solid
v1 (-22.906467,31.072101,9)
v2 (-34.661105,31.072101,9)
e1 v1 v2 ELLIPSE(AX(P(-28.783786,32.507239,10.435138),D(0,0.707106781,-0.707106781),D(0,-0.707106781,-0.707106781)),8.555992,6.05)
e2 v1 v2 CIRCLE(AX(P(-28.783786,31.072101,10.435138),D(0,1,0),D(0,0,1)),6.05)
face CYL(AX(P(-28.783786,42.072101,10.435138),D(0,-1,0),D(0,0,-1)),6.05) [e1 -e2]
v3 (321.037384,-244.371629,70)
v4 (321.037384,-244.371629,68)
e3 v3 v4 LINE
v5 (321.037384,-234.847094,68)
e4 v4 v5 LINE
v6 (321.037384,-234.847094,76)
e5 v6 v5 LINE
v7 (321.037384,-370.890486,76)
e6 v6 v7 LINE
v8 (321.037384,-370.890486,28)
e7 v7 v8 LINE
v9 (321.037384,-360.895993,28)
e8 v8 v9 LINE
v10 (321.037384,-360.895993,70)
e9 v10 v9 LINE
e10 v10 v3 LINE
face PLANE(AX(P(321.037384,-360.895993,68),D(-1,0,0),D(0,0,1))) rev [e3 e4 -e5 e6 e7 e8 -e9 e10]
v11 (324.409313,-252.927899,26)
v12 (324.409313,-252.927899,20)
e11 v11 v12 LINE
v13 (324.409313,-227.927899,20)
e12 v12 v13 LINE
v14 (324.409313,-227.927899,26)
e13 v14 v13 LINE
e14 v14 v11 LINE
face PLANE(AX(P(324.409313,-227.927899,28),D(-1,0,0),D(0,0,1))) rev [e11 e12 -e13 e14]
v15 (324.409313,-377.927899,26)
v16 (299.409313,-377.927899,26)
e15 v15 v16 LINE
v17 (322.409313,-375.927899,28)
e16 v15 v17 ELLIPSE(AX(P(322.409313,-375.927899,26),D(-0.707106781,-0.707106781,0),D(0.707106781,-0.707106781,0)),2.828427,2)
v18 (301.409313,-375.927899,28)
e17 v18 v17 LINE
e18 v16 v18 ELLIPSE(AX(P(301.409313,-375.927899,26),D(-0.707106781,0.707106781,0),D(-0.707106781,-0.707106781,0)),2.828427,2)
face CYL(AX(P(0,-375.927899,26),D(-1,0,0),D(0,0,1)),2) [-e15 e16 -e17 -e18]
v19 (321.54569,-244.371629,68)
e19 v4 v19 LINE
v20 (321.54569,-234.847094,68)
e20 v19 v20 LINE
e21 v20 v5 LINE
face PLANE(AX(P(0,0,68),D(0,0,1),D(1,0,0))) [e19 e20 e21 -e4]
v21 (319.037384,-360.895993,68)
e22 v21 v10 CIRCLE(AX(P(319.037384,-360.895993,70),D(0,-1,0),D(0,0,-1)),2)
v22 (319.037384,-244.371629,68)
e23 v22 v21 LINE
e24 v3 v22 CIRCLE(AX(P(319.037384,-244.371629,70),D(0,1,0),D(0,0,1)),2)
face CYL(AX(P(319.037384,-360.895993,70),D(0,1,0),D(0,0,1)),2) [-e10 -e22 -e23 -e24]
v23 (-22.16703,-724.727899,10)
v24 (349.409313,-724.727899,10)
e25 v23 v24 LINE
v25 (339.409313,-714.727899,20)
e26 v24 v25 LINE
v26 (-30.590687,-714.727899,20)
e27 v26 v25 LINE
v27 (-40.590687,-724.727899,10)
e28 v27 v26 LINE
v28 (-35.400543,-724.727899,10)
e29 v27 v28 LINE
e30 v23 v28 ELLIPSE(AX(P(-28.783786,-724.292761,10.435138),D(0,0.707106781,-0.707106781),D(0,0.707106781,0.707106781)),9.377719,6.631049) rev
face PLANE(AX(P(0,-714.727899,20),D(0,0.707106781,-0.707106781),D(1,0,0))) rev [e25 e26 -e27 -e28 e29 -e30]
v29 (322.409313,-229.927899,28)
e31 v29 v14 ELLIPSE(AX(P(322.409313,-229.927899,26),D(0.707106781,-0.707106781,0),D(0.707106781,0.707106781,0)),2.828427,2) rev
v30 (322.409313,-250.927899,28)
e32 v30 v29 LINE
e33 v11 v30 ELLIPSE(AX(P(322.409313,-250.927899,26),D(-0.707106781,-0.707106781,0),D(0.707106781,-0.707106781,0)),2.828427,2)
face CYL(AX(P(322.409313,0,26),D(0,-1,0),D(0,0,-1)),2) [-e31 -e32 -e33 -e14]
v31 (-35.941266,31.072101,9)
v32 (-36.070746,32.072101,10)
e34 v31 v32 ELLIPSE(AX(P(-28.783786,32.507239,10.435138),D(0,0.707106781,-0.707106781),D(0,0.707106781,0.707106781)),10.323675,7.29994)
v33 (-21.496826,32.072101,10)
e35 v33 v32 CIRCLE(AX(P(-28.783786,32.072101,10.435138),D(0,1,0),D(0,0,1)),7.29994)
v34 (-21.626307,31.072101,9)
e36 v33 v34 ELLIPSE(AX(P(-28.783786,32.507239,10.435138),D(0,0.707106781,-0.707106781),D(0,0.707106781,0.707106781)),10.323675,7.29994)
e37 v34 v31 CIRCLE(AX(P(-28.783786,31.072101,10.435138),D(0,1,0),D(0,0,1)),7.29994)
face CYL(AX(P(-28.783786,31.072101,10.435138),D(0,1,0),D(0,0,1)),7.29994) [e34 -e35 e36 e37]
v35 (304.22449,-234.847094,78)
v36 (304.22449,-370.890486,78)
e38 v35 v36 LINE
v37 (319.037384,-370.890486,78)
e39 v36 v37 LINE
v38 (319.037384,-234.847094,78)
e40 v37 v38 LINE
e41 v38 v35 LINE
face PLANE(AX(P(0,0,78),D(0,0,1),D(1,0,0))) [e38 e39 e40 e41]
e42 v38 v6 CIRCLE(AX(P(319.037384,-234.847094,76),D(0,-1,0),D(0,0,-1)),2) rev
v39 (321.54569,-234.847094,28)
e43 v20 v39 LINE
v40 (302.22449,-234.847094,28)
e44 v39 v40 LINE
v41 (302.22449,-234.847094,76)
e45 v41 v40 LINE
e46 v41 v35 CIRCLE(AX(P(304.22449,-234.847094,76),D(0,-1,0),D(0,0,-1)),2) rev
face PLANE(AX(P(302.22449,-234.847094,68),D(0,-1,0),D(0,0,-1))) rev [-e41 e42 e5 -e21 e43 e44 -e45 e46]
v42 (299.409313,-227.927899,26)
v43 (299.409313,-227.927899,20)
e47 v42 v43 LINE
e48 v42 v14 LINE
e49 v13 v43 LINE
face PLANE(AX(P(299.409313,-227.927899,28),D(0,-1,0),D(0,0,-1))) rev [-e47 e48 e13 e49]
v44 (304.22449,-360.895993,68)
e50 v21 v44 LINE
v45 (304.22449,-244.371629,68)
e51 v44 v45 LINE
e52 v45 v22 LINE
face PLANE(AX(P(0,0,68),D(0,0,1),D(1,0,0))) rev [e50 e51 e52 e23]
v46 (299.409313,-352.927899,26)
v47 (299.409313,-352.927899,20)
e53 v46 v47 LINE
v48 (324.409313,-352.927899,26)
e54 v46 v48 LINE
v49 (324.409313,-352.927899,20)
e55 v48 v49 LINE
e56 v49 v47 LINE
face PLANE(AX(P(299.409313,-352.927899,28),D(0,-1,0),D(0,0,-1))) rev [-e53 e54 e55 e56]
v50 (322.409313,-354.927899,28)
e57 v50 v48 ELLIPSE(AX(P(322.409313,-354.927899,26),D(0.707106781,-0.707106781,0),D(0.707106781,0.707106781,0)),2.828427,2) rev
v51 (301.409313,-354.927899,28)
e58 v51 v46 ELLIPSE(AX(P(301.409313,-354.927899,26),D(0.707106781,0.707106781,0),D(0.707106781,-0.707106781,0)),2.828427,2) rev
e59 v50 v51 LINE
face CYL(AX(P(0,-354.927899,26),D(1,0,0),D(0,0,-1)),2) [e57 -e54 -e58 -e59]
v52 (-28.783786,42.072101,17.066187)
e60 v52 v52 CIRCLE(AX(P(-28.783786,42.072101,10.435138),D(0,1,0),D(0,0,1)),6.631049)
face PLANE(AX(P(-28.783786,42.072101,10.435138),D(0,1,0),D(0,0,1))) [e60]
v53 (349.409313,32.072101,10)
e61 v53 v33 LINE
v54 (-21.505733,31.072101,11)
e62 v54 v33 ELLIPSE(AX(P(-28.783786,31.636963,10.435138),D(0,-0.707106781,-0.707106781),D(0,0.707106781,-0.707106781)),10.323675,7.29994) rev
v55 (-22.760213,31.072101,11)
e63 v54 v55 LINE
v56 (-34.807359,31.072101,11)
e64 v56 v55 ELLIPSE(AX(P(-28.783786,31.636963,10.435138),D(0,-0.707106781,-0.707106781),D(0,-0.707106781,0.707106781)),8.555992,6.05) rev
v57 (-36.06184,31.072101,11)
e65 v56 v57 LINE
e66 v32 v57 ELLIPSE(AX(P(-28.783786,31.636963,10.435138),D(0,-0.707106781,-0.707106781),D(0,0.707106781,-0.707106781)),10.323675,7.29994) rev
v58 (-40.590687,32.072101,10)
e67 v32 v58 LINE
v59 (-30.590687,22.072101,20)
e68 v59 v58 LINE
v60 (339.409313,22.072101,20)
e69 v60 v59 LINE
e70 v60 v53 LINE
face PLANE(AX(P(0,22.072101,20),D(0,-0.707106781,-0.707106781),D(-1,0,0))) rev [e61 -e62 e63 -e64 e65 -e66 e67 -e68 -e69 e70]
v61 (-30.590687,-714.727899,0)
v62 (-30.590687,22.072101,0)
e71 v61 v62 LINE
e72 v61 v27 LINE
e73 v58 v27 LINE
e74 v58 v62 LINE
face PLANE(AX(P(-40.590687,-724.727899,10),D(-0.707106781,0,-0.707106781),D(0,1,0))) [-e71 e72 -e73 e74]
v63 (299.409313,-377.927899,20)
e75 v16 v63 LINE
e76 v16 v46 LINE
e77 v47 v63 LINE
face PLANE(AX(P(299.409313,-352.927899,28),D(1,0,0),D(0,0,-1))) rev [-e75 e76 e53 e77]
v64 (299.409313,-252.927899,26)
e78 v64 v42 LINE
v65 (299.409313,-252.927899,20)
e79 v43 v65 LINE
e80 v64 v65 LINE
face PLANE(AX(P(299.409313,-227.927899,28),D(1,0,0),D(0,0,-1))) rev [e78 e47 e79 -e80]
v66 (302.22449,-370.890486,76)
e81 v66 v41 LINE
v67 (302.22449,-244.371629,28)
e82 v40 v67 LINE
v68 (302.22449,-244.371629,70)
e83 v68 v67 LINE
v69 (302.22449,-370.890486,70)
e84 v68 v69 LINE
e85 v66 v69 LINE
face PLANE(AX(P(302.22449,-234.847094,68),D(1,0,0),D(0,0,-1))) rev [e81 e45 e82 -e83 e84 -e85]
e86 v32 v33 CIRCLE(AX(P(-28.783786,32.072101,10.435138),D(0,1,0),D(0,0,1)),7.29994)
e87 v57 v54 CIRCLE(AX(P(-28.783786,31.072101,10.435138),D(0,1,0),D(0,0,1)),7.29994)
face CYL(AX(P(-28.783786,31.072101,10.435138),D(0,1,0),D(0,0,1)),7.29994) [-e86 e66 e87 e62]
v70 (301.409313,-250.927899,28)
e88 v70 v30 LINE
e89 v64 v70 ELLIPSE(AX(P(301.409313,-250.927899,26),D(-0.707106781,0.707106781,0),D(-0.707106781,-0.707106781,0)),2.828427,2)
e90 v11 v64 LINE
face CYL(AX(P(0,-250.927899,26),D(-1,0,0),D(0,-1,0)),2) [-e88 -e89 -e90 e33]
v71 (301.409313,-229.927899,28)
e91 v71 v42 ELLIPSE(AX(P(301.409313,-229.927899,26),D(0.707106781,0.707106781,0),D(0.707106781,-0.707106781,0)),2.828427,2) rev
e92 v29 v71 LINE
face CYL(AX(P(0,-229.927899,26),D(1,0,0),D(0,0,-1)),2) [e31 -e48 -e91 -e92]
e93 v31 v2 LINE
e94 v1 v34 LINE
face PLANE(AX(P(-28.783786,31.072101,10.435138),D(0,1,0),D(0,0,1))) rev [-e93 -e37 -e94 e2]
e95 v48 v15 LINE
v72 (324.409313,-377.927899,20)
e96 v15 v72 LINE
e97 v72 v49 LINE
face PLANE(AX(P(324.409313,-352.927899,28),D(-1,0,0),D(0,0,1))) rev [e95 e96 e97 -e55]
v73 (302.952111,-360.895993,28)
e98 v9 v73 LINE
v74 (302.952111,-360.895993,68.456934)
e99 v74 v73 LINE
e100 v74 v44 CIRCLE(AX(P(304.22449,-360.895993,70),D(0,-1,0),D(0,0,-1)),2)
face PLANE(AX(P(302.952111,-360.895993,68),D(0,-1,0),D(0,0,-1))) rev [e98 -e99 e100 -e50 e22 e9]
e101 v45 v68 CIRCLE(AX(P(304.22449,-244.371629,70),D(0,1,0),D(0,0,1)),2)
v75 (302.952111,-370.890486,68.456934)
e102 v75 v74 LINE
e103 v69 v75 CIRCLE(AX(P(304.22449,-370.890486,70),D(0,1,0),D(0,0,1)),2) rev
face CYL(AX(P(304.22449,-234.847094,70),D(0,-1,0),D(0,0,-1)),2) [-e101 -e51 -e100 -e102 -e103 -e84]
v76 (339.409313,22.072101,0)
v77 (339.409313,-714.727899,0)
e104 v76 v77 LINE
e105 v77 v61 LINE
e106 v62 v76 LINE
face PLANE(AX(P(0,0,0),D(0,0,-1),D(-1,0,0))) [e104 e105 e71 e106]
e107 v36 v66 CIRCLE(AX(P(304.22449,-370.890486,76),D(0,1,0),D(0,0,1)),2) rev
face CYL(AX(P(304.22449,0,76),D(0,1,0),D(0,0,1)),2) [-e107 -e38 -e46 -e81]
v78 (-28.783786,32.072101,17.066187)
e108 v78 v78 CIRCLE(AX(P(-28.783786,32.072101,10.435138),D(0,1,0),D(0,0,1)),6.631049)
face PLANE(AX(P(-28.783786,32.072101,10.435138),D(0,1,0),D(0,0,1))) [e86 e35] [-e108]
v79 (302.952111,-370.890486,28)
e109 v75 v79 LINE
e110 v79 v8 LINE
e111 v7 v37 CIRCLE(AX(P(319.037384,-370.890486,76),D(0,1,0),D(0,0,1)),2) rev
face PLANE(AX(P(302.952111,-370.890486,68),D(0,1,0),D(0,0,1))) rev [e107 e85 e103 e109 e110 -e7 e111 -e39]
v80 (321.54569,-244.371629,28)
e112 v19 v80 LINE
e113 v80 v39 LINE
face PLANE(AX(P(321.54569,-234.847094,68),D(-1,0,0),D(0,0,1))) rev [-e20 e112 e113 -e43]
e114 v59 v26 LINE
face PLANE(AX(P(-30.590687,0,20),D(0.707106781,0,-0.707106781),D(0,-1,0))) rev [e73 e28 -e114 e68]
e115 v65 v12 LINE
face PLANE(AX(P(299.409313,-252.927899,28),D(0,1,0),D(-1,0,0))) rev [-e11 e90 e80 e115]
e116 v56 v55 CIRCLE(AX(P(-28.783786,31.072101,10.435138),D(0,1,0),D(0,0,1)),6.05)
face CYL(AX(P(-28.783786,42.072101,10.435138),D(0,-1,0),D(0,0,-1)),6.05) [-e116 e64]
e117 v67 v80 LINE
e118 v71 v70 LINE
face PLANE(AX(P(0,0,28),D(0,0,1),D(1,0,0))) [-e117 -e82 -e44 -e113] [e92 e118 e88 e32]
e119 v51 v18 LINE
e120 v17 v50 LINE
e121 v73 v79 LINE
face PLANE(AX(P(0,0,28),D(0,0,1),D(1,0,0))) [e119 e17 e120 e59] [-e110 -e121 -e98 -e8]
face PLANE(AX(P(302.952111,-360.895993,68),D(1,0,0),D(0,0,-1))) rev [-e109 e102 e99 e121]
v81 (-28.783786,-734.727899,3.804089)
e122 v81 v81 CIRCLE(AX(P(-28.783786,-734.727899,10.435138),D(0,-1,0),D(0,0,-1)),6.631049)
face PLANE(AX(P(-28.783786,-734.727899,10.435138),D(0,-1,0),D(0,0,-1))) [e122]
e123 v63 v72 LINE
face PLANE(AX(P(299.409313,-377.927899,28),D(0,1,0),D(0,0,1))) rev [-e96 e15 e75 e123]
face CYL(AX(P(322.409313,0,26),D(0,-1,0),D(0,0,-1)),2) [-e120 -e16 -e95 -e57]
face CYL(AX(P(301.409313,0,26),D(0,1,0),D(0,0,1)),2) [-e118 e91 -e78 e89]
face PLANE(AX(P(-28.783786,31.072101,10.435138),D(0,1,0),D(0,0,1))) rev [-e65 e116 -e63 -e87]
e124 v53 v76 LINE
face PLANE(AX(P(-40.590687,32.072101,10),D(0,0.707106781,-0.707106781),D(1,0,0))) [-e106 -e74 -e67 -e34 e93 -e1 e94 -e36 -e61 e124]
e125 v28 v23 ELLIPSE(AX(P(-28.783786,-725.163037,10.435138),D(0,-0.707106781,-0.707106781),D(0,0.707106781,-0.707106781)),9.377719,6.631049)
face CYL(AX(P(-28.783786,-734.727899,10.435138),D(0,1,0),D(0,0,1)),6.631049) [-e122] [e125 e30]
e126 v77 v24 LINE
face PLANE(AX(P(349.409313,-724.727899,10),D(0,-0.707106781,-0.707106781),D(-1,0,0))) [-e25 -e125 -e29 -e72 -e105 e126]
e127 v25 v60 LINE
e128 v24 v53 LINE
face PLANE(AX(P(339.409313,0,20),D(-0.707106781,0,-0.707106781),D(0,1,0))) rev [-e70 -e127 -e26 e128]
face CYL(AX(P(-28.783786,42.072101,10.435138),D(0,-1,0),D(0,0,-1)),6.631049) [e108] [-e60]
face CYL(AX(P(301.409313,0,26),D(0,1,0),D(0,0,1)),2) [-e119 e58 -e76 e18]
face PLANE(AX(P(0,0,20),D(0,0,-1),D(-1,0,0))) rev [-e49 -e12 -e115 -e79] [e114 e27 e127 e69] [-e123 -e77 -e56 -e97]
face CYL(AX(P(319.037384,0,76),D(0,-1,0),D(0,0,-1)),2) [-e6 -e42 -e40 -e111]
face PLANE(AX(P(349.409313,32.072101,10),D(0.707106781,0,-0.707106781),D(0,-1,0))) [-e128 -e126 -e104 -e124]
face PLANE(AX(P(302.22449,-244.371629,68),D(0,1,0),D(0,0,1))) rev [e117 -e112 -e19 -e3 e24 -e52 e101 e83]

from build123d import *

# Parameters (mm, degrees)
SKETCH1_W            = 390
SKETCH1_H            = 756.8
BOSS_EXTRUDE1_DEPTH  = 20
SKETCH2_R            = 6.05
BOSS_EXTRUDE2_DEPTH  = 10
SKETCH3_R            = 6.631048811
BOSS_EXTRUDE3_DEPTH  = 10
CHAMFER1_SIZE        = 10
BOSS_EXTRUDE5_DEPTH  = 50
SKETCH5_W            = 30
SKETCH5_H            = 160
CUT_EXTRUDE1_DEPTH   = 50
CHAMFER2_SIZE        = 10
CUT_EXTRUDE2_DEPTH   = 121
SKETCH10_W           = 25
SKETCH10_H           = 25
BOSS_EXTRUDE7_DEPTH  = 8
SKETCH15_W           = 19.321199796
SKETCH15_H           = 9.52453511
BOSS_EXTRUDE8_DEPTH  = 40
SKETCH16_W           = 18.085272723
SKETCH16_H           = 9.99449282
BOSS_EXTRUDE9_DEPTH  = 40
SKETCH18_W           = 18.812893718
SKETCH18_H           = 136.043392328
BOSS_EXTRUDE10_DEPTH = 10
FILLET1_R            = 2
FILLET2_R            = 2
FILLET3_R            = 2
CUT_EXTRUDE3_START   = -10
SKETCH23_R           = 6.05
CUT_EXTRUDE3_DEPTH   = 10
SKETCH24_R           = 7.299940413
BOSS_EXTRUDE11_DEPTH = 1
BOSS_EXTRUDE12_START = 10
SKETCH27_R           = 6.63104881
BOSS_EXTRUDE12_DEPTH = 10


with BuildPart() as part:
    # Sketch1 → Boss-Extrude1 (new body)
    with BuildSketch(Plane.XY):
        with Locations((154.409313495, -346.327898551)):
            Rectangle(SKETCH1_W, SKETCH1_H)
    extrude(amount=BOSS_EXTRUDE1_DEPTH)

    # Sketch2 → Boss-Extrude2 (add)
    with BuildSketch(Plane(origin=(0, 32.072101449, 0), x_dir=(1, 0, 0), z_dir=(0, 1, 0))):
        with Locations(Location((-28.78378628, -10.435138004, 0), (0, 0, 90))):
            Circle(SKETCH2_R)
    extrude(amount=BOSS_EXTRUDE2_DEPTH)

    # Sketch3 → Boss-Extrude3 (add)
    with BuildSketch(Plane.XZ.offset(724.727898551)):
        with Locations(Location((-28.78378628, 10.435138004, 0), (0, 0, 90))):
            Circle(SKETCH3_R)
    extrude(amount=BOSS_EXTRUDE3_DEPTH)

    # Chamfer1
    # the kernel refuses this chamfer: 10 mm, written as the material it takes off along each edge
    with BuildSketch(Plane(origin=(-40.590686505, -750.44472843, 20), x_dir=(-0.027495876610586317, 0, -0.9996219169112968), z_dir=(0, 1, 0)), Plane(origin=(349.409313495, 57.788931329, 0), x_dir=(-0.9996219169112968, 0, -0.027495876610586334), z_dir=(0, -1, 0))) as chamfer1_piece_1:
        Polygon((CHAMFER1_SIZE * 0.999621916911, -CHAMFER1_SIZE * 0.0274958766106), (-CHAMFER1_SIZE * 0.0274958766106, -CHAMFER1_SIZE * 0.999621916911), (0, 0), align=None)
    extrude(amount=808.233659759, mode=Mode.SUBTRACT)
    with BuildSketch(Plane(origin=(375.126143374, -724.727898551, 20), x_dir=(0, 0.9996219169112968, 0.02749587661058643), z_dir=(-1, 0, 0))) as chamfer1_piece_2_section:
        Polygon((CHAMFER1_SIZE * 0.999621916911, CHAMFER1_SIZE * 0.0274958766106), (-CHAMFER1_SIZE * 0.0274958766106, CHAMFER1_SIZE * 0.999621916911), (0, 0), align=None)
    chamfer1_piece_2 = extrude(amount=441.433659759, mode=Mode.PRIVATE)
    chamfer1_piece_2 = chamfer1_piece_2 - Plane(origin=(-28.78378628, -721.415314621, 10.435138004), x_dir=(0, 0, 1), z_dir=(0, 1, 0)) * Cylinder(6.631048811, 923, mode=Mode.PRIVATE)
    add(chamfer1_piece_2, mode=Mode.SUBTRACT)
    with BuildSketch(Plane(origin=(349.409313495, 57.788931329, 20), x_dir=(-0.9996219169112968, 0, 0.027495876610586282), z_dir=(0, -1, 0)), Plane(origin=(-40.590686505, -750.44472843, 0), x_dir=(-0.027495876610586317, 0, 0.9996219169112968), z_dir=(0, 1, 0))) as chamfer1_piece_3:
        Polygon((CHAMFER1_SIZE * 0.999621916911, CHAMFER1_SIZE * 0.0274958766106), (-CHAMFER1_SIZE * 0.0274958766106, CHAMFER1_SIZE * 0.999621916911), (0, 0), align=None)
    extrude(amount=808.233659759, mode=Mode.SUBTRACT)
    with BuildSketch(Plane(origin=(-66.307516385, 32.072101449, 20), x_dir=(0, 0.027495876610586317, -0.9996219169112968), z_dir=(1, 0, 0))) as chamfer1_piece_4_section:
        Polygon((CHAMFER1_SIZE * 0.999621916911, -CHAMFER1_SIZE * 0.0274958766106), (-CHAMFER1_SIZE * 0.0274958766106, -CHAMFER1_SIZE * 0.999621916911), (0, 0), align=None)
    chamfer1_piece_4 = extrude(amount=441.433659759, mode=Mode.PRIVATE)
    chamfer1_piece_4 = chamfer1_piece_4 - Plane(origin=(-28.78378628, 28.76135635, 10.435138004), x_dir=(0, 0, -1), z_dir=(0, -1, 0)) * Cylinder(6.05, 923, mode=Mode.PRIVATE)
    add(chamfer1_piece_4, mode=Mode.SUBTRACT)
    with BuildSketch(Plane(origin=(375.126143374, -724.727898551, 0), x_dir=(0, 0.9996219169112968, -0.027495876610586487), z_dir=(-1, 0, 0))) as chamfer1_piece_5_section:
        Polygon((CHAMFER1_SIZE * 0.999621916911, -CHAMFER1_SIZE * 0.0274958766106), (-CHAMFER1_SIZE * 0.0274958766106, -CHAMFER1_SIZE * 0.999621916911), (0, 0), align=None)
    chamfer1_piece_5 = extrude(amount=441.433659759, mode=Mode.PRIVATE)
    chamfer1_piece_5 = chamfer1_piece_5 - Plane(origin=(-28.78378628, -721.416873801, 10.435138004), x_dir=(0, 0, 1), z_dir=(0, 1, 0)) * Cylinder(6.631048811, 923, mode=Mode.PRIVATE)
    add(chamfer1_piece_5, mode=Mode.SUBTRACT)
    with BuildSketch(Plane(origin=(-66.307516385, 32.072101449, 0), x_dir=(0, 0.027495876610586317, 0.9996219169112968), z_dir=(1, 0, 0))) as chamfer1_piece_6_section:
        Polygon((CHAMFER1_SIZE * 0.999621916911, CHAMFER1_SIZE * 0.0274958766106), (-CHAMFER1_SIZE * 0.0274958766106, CHAMFER1_SIZE * 0.999621916911), (0, 0), align=None)
    chamfer1_piece_6 = extrude(amount=441.433659759, mode=Mode.PRIVATE)
    chamfer1_piece_6 = chamfer1_piece_6 - Plane(origin=(-28.78378628, 28.763199232, 10.435138004), x_dir=(0, 0, -1), z_dir=(0, -1, 0)) * Cylinder(6.05, 923, mode=Mode.PRIVATE)
    add(chamfer1_piece_6, mode=Mode.SUBTRACT)

    # Sketch4 → Boss-Extrude5 (add)
    with BuildSketch(Plane.XY.offset(20)):
        Polygon((309.409313495, -346.327898551), (309.409313495, -246.327898551), (339.409313495, -246.327898551), (339.409313495, -446.327898551), (309.409313495, -446.327898551), align=None)
    extrude(amount=BOSS_EXTRUDE5_DEPTH)

    # Sketch5 → Cut-Extrude1 (cut)
    with BuildSketch(Plane(origin=(339.409313495, 0, 0), x_dir=(0, 0, -1), z_dir=(1, 0, 0))):
        with Locations((-35, -346.327898551)):
            Rectangle(SKETCH5_W, SKETCH5_H)
    extrude(amount=-CUT_EXTRUDE1_DEPTH, mode=Mode.SUBTRACT)

    # Chamfer2
    chamfer2_edges = [part.edges().sort_by_distance(p)[0] for p in [
        (309.409313495, -346.327898551, 70),
        (309.409313495, -246.327898551, 45),
        (324.409313495, -446.327898551, 70),
        (309.409313495, -446.327898551, 45),
        (339.409313495, -446.327898551, 45),
        (324.409313495, -246.327898551, 70),
        (339.409313495, -246.327898551, 45),
        (339.409313495, -346.327898551, 70),
    ]]
    chamfer(chamfer2_edges, length=CHAMFER2_SIZE)

    # Sketch7 → Cut-Extrude2 (cut)
    with BuildSketch(Plane.XY.offset(20)):
        Polygon((309.409313495, -256.327898551), (319.409313495, -246.327898551), (329.409313495, -246.327898551), (339.409313495, -256.327898551), (339.409313495, -436.327898551), (329.409313495, -446.327898551), (319.409313495, -446.327898551), (309.409313495, -436.327898551), align=None)
    extrude(amount=CUT_EXTRUDE2_DEPTH, mode=Mode.SUBTRACT)

    # Sketch10 → Boss-Extrude7 (add)
    with BuildSketch(Plane.XY.offset(20)):
        with Locations((311.909313495, -240.427898551)):
            Rectangle(SKETCH10_W, SKETCH10_H)
        with Locations((311.909313495, -365.427898551)):
            Rectangle(SKETCH10_W, SKETCH10_H)
    extrude(amount=BOSS_EXTRUDE7_DEPTH)

    # Sketch15 → Boss-Extrude8 (add)
    with BuildSketch(Plane.XY.offset(28)):
        with Locations((311.88508976, -239.60936129)):
            Rectangle(SKETCH15_W, SKETCH15_H)
    extrude(amount=BOSS_EXTRUDE8_DEPTH)

    # Sketch16 → Boss-Extrude9 (add)
    with BuildSketch(Plane.XY.offset(28)):
        with Locations((311.994747219, -365.893239653)):
            Rectangle(SKETCH16_W, SKETCH16_H)
    extrude(amount=BOSS_EXTRUDE9_DEPTH)

    # Sketch18 → Boss-Extrude10 (add)
    with BuildSketch(Plane.XY.offset(68)):
        with Locations((311.630936721, -302.868789899)):
            Rectangle(SKETCH18_W, SKETCH18_H)
    extrude(amount=BOSS_EXTRUDE10_DEPTH)

    # Fillet1
    fillet1_edges = [part.edges().sort_by_distance(p)[0] for p in [
        (302.224489862, -307.631057454, 68),
        (321.03738358, -302.633811044, 68),
        (321.03738358, -302.868789899, 78),
        (302.224489862, -302.868789899, 78),
    ]]
    fillet(fillet1_edges, radius=FILLET1_R)

    # Fillet2
    fillet2_edges = [part.edges().sort_by_distance(p)[0] for p in [
        (299.409313495, -240.427898551, 28),
        (311.909313495, -252.927898551, 28),
        (324.409313495, -240.427898551, 28),
        (311.909313495, -227.927898551, 28),
    ]]
    fillet(fillet2_edges, radius=FILLET2_R)

    # Fillet3
    fillet3_edges = [part.edges().sort_by_distance(p)[0] for p in [
        (299.409313495, -365.427898551, 28),
        (311.909313495, -377.927898551, 28),
        (324.409313495, -365.427898551, 28),
        (311.909313495, -352.927898551, 28),
    ]]
    fillet(fillet3_edges, radius=FILLET3_R)

    # Sketch23 → Cut-Extrude3 (cut)
    with BuildSketch(Plane(origin=(0, 42.072101449, 0), x_dir=(1, 0, 0), z_dir=(0, 1, 0)).offset(CUT_EXTRUDE3_START)):
        with Locations((-28.78378628, -10.435138004)):
            Circle(SKETCH23_R)
    extrude(amount=CUT_EXTRUDE3_DEPTH, mode=Mode.SUBTRACT)

    # Sketch24 → Boss-Extrude11 (add)
    with BuildSketch(Plane(origin=(0, 32.072101449, 0), x_dir=(1, 0, 0), z_dir=(0, 1, 0))):
        with Locations((-28.78378628, -10.435138004)):
            Circle(SKETCH24_R)
    extrude(amount=-BOSS_EXTRUDE11_DEPTH)

    # Sketch27 → Boss-Extrude12 (add)
    with BuildSketch(Plane(origin=(0, 32.072101449, 0), x_dir=(1, 0, 0), z_dir=(0, 1, 0)).offset(BOSS_EXTRUDE12_START)):
        with Locations(Location((-28.78378628, -10.435138004, 0), (0, 0, 3.762526837))):
            Circle(SKETCH27_R)
    extrude(amount=-BOSS_EXTRUDE12_DEPTH)


solid = part.part
